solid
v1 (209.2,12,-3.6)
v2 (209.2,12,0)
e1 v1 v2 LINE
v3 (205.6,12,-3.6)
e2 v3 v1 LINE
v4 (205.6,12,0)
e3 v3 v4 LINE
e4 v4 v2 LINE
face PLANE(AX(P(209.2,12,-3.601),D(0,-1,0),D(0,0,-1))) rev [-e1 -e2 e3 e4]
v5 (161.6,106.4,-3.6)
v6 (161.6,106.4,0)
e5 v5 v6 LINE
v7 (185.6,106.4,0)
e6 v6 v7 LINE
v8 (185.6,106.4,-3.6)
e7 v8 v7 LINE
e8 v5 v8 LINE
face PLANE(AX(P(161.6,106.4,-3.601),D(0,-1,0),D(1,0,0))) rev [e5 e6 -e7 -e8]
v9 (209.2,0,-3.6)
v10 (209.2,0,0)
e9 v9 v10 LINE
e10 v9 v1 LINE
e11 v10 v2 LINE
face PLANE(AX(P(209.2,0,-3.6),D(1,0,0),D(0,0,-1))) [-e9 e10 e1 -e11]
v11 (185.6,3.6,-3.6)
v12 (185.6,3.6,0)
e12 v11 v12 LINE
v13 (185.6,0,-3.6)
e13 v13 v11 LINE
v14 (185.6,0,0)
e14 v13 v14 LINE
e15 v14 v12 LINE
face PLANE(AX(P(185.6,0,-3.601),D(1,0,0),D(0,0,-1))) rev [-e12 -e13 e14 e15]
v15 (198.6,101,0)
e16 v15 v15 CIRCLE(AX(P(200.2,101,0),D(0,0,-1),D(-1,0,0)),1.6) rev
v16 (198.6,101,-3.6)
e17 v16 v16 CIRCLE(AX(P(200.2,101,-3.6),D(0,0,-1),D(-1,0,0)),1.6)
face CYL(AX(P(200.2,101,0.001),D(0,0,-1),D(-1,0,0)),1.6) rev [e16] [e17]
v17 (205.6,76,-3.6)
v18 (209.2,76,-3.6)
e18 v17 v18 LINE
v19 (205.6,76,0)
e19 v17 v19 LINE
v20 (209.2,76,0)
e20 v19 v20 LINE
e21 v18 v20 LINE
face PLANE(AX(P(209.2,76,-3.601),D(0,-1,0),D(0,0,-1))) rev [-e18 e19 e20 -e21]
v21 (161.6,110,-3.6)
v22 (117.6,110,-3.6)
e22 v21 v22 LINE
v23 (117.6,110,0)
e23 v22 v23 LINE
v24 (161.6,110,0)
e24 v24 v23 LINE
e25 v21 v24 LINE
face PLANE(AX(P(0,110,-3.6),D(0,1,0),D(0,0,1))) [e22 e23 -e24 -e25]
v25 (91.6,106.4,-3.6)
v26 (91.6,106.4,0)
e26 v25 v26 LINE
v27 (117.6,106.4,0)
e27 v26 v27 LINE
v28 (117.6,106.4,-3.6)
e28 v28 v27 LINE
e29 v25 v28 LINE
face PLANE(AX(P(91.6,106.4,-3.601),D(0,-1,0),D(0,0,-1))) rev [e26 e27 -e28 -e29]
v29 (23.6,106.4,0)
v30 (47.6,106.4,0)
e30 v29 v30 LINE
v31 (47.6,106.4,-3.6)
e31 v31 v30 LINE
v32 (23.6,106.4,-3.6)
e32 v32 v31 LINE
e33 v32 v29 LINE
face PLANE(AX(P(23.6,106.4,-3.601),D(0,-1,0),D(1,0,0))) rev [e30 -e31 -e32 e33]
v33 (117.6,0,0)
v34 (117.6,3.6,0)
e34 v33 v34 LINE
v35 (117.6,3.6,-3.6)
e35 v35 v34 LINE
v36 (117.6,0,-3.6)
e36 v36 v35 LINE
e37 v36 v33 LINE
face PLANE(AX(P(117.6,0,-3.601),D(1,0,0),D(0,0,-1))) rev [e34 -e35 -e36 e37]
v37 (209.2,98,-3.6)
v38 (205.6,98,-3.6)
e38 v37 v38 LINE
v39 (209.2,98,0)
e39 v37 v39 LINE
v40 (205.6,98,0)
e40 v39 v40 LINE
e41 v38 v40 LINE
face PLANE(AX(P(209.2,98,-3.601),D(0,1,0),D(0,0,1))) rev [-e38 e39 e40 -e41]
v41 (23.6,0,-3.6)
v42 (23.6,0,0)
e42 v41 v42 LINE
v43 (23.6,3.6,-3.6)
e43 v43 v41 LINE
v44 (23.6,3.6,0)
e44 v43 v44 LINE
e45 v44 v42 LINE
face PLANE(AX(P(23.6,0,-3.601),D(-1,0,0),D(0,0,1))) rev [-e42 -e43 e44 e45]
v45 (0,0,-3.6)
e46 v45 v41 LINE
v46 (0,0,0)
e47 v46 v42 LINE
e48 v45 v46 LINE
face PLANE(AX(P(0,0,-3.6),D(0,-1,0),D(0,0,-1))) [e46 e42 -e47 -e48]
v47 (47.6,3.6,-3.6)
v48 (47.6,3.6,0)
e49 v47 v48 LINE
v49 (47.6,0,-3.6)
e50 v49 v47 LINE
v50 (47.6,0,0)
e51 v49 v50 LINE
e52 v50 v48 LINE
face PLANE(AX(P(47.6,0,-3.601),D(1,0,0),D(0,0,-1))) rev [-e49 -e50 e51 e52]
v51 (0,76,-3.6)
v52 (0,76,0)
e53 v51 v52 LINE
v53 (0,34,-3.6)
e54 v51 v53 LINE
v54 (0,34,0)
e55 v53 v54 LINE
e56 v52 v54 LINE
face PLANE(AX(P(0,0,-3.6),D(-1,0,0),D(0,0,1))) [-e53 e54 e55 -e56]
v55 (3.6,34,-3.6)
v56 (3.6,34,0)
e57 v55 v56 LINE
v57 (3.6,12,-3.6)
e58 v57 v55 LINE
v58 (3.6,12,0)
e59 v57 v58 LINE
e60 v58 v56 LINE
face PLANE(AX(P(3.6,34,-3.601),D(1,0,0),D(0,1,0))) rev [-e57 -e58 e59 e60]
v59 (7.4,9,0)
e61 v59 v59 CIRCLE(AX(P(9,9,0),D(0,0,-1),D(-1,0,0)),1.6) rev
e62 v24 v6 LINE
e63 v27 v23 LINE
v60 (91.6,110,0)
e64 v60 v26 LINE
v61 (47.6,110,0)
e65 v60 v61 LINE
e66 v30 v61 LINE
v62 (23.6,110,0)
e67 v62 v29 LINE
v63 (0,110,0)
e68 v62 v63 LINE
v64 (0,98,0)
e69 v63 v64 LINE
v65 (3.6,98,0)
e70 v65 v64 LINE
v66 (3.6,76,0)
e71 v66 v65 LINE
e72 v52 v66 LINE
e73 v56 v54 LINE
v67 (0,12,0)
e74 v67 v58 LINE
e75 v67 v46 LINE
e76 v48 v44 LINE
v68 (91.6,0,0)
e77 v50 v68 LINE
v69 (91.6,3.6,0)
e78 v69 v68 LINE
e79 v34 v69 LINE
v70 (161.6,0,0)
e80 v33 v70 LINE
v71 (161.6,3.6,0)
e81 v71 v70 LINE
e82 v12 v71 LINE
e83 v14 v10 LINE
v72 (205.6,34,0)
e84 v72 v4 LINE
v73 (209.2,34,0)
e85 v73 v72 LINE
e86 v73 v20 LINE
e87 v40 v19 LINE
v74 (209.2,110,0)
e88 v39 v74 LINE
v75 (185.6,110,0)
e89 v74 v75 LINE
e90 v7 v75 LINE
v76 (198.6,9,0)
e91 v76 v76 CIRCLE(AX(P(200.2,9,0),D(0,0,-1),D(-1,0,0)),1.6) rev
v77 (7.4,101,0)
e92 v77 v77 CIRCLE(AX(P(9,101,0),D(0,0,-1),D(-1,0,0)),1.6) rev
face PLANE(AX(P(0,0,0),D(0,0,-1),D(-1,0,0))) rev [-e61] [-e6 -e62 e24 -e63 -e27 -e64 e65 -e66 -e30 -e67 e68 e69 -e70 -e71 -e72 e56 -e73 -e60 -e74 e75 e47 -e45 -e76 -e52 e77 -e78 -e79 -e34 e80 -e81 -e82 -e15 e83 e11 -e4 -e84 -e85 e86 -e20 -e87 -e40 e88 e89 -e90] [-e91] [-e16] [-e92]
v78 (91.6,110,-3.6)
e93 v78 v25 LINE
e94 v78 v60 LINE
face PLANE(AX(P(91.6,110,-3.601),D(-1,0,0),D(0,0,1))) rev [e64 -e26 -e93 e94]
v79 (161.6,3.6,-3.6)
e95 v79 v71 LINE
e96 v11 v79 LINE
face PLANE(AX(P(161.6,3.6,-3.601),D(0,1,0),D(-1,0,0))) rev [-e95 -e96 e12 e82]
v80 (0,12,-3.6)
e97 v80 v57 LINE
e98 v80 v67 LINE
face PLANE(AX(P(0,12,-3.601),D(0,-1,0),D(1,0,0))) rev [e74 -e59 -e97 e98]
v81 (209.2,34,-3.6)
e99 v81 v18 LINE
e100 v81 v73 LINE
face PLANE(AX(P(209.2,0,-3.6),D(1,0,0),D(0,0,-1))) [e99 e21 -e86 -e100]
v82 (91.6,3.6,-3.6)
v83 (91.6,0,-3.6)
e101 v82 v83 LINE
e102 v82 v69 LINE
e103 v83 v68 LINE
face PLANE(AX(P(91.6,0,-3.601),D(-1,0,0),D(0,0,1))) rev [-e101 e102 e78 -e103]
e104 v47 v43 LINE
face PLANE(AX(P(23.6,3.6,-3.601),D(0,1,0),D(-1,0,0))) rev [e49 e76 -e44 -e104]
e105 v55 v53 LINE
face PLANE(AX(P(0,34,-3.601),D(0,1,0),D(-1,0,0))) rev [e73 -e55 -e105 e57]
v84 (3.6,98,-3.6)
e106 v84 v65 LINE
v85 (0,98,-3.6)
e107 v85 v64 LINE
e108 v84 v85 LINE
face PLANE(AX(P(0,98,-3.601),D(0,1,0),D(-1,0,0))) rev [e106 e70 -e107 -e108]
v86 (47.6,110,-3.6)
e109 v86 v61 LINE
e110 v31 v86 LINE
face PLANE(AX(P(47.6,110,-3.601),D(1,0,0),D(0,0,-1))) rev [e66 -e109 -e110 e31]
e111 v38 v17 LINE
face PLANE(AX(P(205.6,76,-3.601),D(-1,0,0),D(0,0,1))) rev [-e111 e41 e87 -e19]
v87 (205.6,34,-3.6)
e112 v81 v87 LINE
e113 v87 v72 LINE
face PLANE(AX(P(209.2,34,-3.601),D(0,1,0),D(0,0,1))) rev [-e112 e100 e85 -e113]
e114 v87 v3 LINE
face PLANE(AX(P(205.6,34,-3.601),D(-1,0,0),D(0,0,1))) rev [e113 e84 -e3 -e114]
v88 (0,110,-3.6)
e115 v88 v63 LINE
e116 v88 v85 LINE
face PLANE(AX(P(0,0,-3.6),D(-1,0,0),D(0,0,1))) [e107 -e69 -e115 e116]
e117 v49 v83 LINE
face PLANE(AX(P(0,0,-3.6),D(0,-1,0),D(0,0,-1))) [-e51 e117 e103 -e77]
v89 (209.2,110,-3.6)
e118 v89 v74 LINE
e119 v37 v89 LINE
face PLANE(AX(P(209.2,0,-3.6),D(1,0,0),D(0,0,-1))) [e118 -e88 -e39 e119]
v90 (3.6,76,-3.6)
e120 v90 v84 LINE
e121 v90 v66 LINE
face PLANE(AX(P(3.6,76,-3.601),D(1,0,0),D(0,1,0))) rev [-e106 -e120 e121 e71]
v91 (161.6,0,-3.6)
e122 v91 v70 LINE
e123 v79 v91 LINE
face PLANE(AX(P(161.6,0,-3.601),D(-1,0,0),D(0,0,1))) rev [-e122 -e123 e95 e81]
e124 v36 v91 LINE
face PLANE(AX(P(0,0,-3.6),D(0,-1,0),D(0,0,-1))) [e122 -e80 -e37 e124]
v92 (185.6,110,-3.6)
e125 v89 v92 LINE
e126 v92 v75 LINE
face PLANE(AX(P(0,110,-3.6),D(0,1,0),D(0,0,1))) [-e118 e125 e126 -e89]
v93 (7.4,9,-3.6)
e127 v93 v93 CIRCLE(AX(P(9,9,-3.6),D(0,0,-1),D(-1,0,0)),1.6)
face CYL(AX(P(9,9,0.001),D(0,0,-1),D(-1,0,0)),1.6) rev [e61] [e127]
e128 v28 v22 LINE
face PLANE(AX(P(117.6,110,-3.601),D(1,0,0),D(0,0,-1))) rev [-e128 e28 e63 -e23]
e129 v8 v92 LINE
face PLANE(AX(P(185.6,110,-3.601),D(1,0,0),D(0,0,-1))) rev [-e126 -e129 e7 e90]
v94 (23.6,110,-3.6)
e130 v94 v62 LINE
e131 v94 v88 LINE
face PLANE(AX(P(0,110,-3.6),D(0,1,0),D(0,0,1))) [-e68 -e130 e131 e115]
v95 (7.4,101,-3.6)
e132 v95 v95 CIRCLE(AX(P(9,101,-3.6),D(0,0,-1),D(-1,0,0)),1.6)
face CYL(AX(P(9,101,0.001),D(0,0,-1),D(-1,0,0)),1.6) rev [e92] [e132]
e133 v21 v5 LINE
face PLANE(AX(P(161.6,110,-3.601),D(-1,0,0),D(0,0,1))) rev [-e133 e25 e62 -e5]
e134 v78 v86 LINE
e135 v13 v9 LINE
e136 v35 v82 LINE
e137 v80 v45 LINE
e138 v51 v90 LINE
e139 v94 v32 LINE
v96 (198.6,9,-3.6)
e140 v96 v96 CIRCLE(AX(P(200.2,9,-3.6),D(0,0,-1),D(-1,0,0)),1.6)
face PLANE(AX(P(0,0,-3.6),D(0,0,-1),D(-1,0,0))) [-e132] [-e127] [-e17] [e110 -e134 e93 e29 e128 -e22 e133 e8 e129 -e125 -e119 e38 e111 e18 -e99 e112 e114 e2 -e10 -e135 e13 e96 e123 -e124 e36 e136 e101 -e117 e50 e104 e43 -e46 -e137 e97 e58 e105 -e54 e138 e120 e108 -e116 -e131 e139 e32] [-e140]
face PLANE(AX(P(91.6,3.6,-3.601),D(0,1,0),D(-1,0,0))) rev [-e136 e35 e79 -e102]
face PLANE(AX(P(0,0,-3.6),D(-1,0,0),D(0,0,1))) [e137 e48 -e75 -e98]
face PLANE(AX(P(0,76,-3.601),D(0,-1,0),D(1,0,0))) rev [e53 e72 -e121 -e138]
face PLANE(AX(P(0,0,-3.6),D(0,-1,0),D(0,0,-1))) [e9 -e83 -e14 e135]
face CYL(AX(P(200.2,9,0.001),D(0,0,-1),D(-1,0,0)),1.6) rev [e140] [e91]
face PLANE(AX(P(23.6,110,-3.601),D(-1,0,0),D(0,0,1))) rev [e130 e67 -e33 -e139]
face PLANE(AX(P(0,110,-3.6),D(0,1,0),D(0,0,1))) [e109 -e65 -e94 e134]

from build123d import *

# Parameters (mm, degrees)
SKETCH_1_W             = 209.2
SKETCH_1_H             = 110
SM_BASE_FLANGE_1_DEPTH = 3.6
CUT_EXTRUDE_1_REACH    = 238.384
SKETCH_2_W             = 3.6
SKETCH_2_H             = 22
SKETCH_2_W_2           = 24
SKETCH_2_H_2           = 3.6
SKETCH_2_W_3           = 26
CUT_EXTRUDE_2_REACH    = 238.384
SKETCH_3_R             = 1.6


# Sheet-metal steps are written as plain solids
with BuildPart() as part:
    # Sketch 1 → Базовая кромка1 (new body)
    with BuildSketch(Plane.XY):
        with Locations((104.6, 55)):
            Rectangle(SKETCH_1_W, SKETCH_1_H)
    extrude(amount=-SM_BASE_FLANGE_1_DEPTH)

    # Sketch 2 → Вырез-Вытянуть1 (cut, up to next)
    with BuildSketch(Plane.XY, mode=Mode.PRIVATE) as cut_extrude_1_sk1:
        with Locations((1.8, 23)):
            Rectangle(SKETCH_2_W, SKETCH_2_H)
    cut_extrude_1_tool1 = extrude(cut_extrude_1_sk1.sketch, amount=-CUT_EXTRUDE_1_REACH, mode=Mode.PRIVATE) & part.part
    # Sketch 2 → Вырез-Вытянуть1 (cut, up to next)
    with BuildSketch(Plane.XY, mode=Mode.PRIVATE) as cut_extrude_1_sk2:
        with Locations((35.6, 1.8)):
            Rectangle(SKETCH_2_W_2, SKETCH_2_H_2)
    cut_extrude_1_tool2 = extrude(cut_extrude_1_sk2.sketch, amount=-CUT_EXTRUDE_1_REACH, mode=Mode.PRIVATE) & part.part
    # Sketch 2 → Вырез-Вытянуть1 (cut, up to next)
    with BuildSketch(Plane.XY, mode=Mode.PRIVATE) as cut_extrude_1_sk3:
        with Locations((207.4, 87)):
            Rectangle(SKETCH_2_W, SKETCH_2_H)
    cut_extrude_1_tool3 = extrude(cut_extrude_1_sk3.sketch, amount=-CUT_EXTRUDE_1_REACH, mode=Mode.PRIVATE) & part.part
    # Sketch 2 → Вырез-Вытянуть1 (cut, up to next)
    with BuildSketch(Plane.XY, mode=Mode.PRIVATE) as cut_extrude_1_sk4:
        with Locations((104.6, 1.8)):
            Rectangle(SKETCH_2_W_3, SKETCH_2_H_2)
    cut_extrude_1_tool4 = extrude(cut_extrude_1_sk4.sketch, amount=-CUT_EXTRUDE_1_REACH, mode=Mode.PRIVATE) & part.part
    # Sketch 2 → Вырез-Вытянуть1 (cut, up to next)
    with BuildSketch(Plane.XY, mode=Mode.PRIVATE) as cut_extrude_1_sk5:
        with Locations((173.6, 1.8)):
            Rectangle(SKETCH_2_W_2, SKETCH_2_H_2)
    cut_extrude_1_tool5 = extrude(cut_extrude_1_sk5.sketch, amount=-CUT_EXTRUDE_1_REACH, mode=Mode.PRIVATE) & part.part
    # Sketch 2 → Вырез-Вытянуть1 (cut, up to next)
    with BuildSketch(Plane.XY, mode=Mode.PRIVATE) as cut_extrude_1_sk6:
        with Locations((207.4, 23)):
            Rectangle(SKETCH_2_W, SKETCH_2_H)
    cut_extrude_1_tool6 = extrude(cut_extrude_1_sk6.sketch, amount=-CUT_EXTRUDE_1_REACH, mode=Mode.PRIVATE) & part.part
    # Sketch 2 → Вырез-Вытянуть1 (cut, up to next)
    with BuildSketch(Plane.XY, mode=Mode.PRIVATE) as cut_extrude_1_sk7:
        with Locations((173.6, 108.2)):
            Rectangle(SKETCH_2_W_2, SKETCH_2_H_2)
    cut_extrude_1_tool7 = extrude(cut_extrude_1_sk7.sketch, amount=-CUT_EXTRUDE_1_REACH, mode=Mode.PRIVATE) & part.part
    # Sketch 2 → Вырез-Вытянуть1 (cut, up to next)
    with BuildSketch(Plane.XY, mode=Mode.PRIVATE) as cut_extrude_1_sk8:
        with Locations((104.6, 108.2)):
            Rectangle(SKETCH_2_W_3, SKETCH_2_H_2)
    cut_extrude_1_tool8 = extrude(cut_extrude_1_sk8.sketch, amount=-CUT_EXTRUDE_1_REACH, mode=Mode.PRIVATE) & part.part
    # Sketch 2 → Вырез-Вытянуть1 (cut, up to next)
    with BuildSketch(Plane.XY, mode=Mode.PRIVATE) as cut_extrude_1_sk9:
        with Locations((35.6, 108.2)):
            Rectangle(SKETCH_2_W_2, SKETCH_2_H_2)
    cut_extrude_1_tool9 = extrude(cut_extrude_1_sk9.sketch, amount=-CUT_EXTRUDE_1_REACH, mode=Mode.PRIVATE) & part.part
    # Sketch 2 → Вырез-Вытянуть1 (cut, up to next)
    with BuildSketch(Plane.XY, mode=Mode.PRIVATE) as cut_extrude_1_sk10:
        with Locations((1.8, 87)):
            Rectangle(SKETCH_2_W, SKETCH_2_H)
    cut_extrude_1_tool10 = extrude(cut_extrude_1_sk10.sketch, amount=-CUT_EXTRUDE_1_REACH, mode=Mode.PRIVATE) & part.part
    add(cut_extrude_1_tool1.solids().sort_by_distance((1.8, 23, 0))[0], mode=Mode.SUBTRACT)
    add(cut_extrude_1_tool2.solids().sort_by_distance((35.6, 1.8, 0))[0], mode=Mode.SUBTRACT)
    add(cut_extrude_1_tool3.solids().sort_by_distance((207.4, 87, 0))[0], mode=Mode.SUBTRACT)
    add(cut_extrude_1_tool4.solids().sort_by_distance((104.6, 1.8, 0))[0], mode=Mode.SUBTRACT)
    add(cut_extrude_1_tool5.solids().sort_by_distance((173.6, 1.8, 0))[0], mode=Mode.SUBTRACT)
    add(cut_extrude_1_tool6.solids().sort_by_distance((207.4, 23, 0))[0], mode=Mode.SUBTRACT)
    add(cut_extrude_1_tool7.solids().sort_by_distance((173.6, 108.2, 0))[0], mode=Mode.SUBTRACT)
    add(cut_extrude_1_tool8.solids().sort_by_distance((104.6, 108.2, 0))[0], mode=Mode.SUBTRACT)
    add(cut_extrude_1_tool9.solids().sort_by_distance((35.6, 108.2, 0))[0], mode=Mode.SUBTRACT)
    add(cut_extrude_1_tool10.solids().sort_by_distance((1.8, 87, 0))[0], mode=Mode.SUBTRACT)

    # Эскиз3 → Вырез-Вытянуть2 (cut, up to next)
    with BuildSketch(Plane(origin=(0, 0, -3.6), x_dir=(-1, 0, 0), z_dir=(0, 0, -1)), mode=Mode.PRIVATE) as cut_extrude_2_sk1:
        with Locations((-9, 9)):
            Circle(SKETCH_3_R)
    cut_extrude_2_tool1 = extrude(cut_extrude_2_sk1.sketch, amount=-CUT_EXTRUDE_2_REACH, mode=Mode.PRIVATE) & part.part
    # Эскиз3 → Вырез-Вытянуть2 (cut, up to next)
    with BuildSketch(Plane(origin=(0, 0, -3.6), x_dir=(-1, 0, 0), z_dir=(0, 0, -1)), mode=Mode.PRIVATE) as cut_extrude_2_sk2:
        with Locations((-9, 101)):
            Circle(SKETCH_3_R)
    cut_extrude_2_tool2 = extrude(cut_extrude_2_sk2.sketch, amount=-CUT_EXTRUDE_2_REACH, mode=Mode.PRIVATE) & part.part
    # Эскиз3 → Вырез-Вытянуть2 (cut, up to next)
    with BuildSketch(Plane(origin=(0, 0, -3.6), x_dir=(-1, 0, 0), z_dir=(0, 0, -1)), mode=Mode.PRIVATE) as cut_extrude_2_sk3:
        with Locations((-200.2, 9)):
            Circle(SKETCH_3_R)
    cut_extrude_2_tool3 = extrude(cut_extrude_2_sk3.sketch, amount=-CUT_EXTRUDE_2_REACH, mode=Mode.PRIVATE) & part.part
    # Эскиз3 → Вырез-Вытянуть2 (cut, up to next)
    with BuildSketch(Plane(origin=(0, 0, -3.6), x_dir=(-1, 0, 0), z_dir=(0, 0, -1)), mode=Mode.PRIVATE) as cut_extrude_2_sk4:
        with Locations((-200.2, 101)):
            Circle(SKETCH_3_R)
    cut_extrude_2_tool4 = extrude(cut_extrude_2_sk4.sketch, amount=-CUT_EXTRUDE_2_REACH, mode=Mode.PRIVATE) & part.part
    add(cut_extrude_2_tool1.solids().sort_by_distance((9, 9, -3.6))[0], mode=Mode.SUBTRACT)
    add(cut_extrude_2_tool2.solids().sort_by_distance((9, 101, -3.6))[0], mode=Mode.SUBTRACT)
    add(cut_extrude_2_tool3.solids().sort_by_distance((200.2, 9, -3.6))[0], mode=Mode.SUBTRACT)
    add(cut_extrude_2_tool4.solids().sort_by_distance((200.2, 101, -3.6))[0], mode=Mode.SUBTRACT)


solid = part.part
